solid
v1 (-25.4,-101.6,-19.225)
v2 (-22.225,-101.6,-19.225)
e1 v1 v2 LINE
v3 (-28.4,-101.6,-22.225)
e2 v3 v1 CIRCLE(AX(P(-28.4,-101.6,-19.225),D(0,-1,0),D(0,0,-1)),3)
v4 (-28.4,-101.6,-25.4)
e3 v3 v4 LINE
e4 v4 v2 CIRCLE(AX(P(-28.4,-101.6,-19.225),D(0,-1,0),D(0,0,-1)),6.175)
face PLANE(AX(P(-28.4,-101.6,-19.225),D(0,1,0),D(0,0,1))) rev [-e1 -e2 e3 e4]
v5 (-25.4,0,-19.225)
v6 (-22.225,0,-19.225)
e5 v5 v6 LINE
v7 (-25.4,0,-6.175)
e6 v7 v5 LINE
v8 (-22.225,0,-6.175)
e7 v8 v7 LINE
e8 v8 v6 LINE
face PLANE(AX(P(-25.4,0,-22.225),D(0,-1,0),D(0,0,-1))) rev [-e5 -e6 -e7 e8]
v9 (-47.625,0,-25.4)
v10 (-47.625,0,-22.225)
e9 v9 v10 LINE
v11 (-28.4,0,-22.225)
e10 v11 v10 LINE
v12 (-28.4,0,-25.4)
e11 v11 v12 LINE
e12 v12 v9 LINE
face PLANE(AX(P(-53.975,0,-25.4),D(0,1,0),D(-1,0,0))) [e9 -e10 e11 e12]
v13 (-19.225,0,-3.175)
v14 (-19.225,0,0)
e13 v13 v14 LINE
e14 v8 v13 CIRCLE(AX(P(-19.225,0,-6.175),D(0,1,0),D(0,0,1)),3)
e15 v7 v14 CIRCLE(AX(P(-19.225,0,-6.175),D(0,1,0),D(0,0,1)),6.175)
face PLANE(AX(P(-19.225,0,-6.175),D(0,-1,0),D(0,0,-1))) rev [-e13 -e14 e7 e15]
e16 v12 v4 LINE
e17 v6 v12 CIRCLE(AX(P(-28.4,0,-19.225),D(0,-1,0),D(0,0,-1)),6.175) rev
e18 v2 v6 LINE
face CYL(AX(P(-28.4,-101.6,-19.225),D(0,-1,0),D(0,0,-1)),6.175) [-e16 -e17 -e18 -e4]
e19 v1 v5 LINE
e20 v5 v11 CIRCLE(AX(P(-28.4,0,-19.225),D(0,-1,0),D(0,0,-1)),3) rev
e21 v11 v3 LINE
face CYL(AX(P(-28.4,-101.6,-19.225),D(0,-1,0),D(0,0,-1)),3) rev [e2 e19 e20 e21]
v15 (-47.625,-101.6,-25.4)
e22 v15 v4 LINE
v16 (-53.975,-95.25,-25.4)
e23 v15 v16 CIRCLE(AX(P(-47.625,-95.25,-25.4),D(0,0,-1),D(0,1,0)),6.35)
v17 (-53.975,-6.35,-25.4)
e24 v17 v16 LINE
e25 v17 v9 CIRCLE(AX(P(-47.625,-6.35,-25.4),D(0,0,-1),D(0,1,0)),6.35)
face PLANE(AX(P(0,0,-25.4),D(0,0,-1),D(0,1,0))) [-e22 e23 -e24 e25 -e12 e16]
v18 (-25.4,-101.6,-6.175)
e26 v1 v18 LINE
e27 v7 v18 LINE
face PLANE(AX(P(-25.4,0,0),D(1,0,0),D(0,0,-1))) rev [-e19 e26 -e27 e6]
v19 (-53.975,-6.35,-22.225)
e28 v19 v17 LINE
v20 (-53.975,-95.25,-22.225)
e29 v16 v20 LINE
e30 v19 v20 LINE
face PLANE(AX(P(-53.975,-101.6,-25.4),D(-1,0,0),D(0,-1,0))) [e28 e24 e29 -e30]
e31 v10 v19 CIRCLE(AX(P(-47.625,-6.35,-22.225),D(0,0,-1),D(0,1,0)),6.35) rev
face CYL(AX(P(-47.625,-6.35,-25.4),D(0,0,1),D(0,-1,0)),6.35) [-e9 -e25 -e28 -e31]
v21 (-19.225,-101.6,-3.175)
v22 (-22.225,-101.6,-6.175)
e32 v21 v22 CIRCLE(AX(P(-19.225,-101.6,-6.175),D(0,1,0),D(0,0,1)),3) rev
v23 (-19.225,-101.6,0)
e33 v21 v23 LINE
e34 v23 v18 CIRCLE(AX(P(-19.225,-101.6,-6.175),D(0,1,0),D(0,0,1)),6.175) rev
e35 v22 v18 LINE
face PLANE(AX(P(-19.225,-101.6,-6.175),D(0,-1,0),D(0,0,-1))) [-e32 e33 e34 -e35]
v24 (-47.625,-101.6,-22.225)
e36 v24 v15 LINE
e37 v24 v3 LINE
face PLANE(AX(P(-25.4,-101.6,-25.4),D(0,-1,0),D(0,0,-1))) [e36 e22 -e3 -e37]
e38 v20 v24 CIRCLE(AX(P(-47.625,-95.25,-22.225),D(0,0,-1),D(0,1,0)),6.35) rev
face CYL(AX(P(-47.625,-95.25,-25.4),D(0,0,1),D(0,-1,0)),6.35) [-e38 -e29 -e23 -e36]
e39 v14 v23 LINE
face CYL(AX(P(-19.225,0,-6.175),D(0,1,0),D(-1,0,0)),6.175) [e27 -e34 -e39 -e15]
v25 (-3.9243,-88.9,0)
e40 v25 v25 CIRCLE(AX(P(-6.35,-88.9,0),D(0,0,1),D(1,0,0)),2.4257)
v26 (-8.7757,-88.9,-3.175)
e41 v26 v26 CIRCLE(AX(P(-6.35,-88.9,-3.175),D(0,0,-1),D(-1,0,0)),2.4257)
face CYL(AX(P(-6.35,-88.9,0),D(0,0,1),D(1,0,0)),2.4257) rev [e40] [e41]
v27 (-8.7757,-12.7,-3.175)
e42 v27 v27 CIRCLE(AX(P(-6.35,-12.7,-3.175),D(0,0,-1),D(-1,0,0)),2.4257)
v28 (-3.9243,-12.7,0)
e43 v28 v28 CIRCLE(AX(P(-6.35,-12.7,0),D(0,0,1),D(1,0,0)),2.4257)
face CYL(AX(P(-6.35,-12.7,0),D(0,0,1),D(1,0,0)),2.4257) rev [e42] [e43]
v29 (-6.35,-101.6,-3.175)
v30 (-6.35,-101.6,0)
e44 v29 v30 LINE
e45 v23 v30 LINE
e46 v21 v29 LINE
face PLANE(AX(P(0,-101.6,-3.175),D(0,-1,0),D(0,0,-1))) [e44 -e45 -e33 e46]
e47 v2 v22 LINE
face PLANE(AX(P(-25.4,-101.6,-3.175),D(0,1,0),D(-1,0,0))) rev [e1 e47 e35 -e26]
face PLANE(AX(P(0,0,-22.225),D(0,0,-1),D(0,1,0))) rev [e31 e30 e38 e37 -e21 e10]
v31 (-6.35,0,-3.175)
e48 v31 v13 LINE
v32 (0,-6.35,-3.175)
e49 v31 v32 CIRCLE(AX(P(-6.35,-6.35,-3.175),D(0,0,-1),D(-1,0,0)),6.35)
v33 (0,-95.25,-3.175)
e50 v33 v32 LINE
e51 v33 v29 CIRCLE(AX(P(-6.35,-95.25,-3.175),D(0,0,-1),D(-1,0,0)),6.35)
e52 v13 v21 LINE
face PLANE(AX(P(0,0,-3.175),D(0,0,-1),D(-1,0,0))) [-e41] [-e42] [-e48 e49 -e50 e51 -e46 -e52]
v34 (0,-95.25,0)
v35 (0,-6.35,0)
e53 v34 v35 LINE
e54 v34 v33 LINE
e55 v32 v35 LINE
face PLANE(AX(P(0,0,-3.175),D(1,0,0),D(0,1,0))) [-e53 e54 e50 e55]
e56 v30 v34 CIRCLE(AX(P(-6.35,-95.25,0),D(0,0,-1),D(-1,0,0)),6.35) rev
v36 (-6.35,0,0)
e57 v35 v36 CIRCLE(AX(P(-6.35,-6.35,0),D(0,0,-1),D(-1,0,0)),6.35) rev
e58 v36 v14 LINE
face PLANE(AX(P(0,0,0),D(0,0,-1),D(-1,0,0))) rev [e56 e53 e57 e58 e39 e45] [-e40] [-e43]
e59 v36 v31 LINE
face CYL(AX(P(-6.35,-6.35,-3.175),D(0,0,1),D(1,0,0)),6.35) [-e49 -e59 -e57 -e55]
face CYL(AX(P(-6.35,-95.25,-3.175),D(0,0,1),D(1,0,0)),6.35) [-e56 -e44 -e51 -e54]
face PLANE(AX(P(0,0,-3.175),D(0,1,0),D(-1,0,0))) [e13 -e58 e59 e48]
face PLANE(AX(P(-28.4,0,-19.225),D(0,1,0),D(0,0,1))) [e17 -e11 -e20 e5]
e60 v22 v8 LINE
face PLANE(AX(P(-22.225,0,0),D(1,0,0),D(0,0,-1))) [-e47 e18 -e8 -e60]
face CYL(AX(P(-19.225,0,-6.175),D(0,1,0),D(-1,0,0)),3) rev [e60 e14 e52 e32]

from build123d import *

# Parameters (mm, degrees)
SKETCH1_W                    = 25.4
SKETCH1_H                    = 101.6
BASE_FLANGE1_DEPTH           = 3.175
EDGE_FLANGE1_STRIP_W         = 18.7
EDGE_FLANGE1_STRIP_H         = 3.175
EDGE_FLANGE1_STRIP_CUT_DEPTH = 101.6
EDGE_FLANGE1_DEPTH           = 101.6
EDGE_FLANGE2_STRIP_W         = 18.7
EDGE_FLANGE2_STRIP_H         = 3.175
EDGE_FLANGE2_STRIP_CUT_DEPTH = 101.6
EDGE_FLANGE2_DEPTH           = 101.6
F_11_0_191_DIAMETER_HOLE1_D  = 4.8514
FILLET1_R                    = 6.35


# Sheet-metal steps are written as plain solids
with BuildPart() as part:
    # Sketch1 → Base-Flange1 (new body)
    with BuildSketch(Plane.XY):
        with Locations((-12.7, -50.8)):
            Rectangle(SKETCH1_W, SKETCH1_H)
    extrude(amount=-BASE_FLANGE1_DEPTH)

    # Edge-Flange1 strip (across the edge) → Edge-Flange1 strip cut (cut)
    with BuildSketch(Plane(origin=(-25.4, -101.6, -3.175), x_dir=(1, 0, 0), z_dir=(0, 1, 0))):
        with Locations((-3.175, -1.5875)):
            Rectangle(EDGE_FLANGE1_STRIP_W, EDGE_FLANGE1_STRIP_H)
    extrude(amount=EDGE_FLANGE1_STRIP_CUT_DEPTH, mode=Mode.SUBTRACT)

    # Edge-Flange1 section (across the edge) → Edge-Flange1 (add)
    with BuildSketch(Plane(origin=(-25.4, -101.6, -3.175), x_dir=(1, 0, 0), z_dir=(0, 1, 0))):
        with BuildLine():
            Line((0, 3), (0, 19.05))
            Line((0, 19.05), (3.175, 19.05))
            Line((3.175, 19.05), (3.175, 3))
            ThreePointArc((3.175, 3), (4.053679656, 0.878679656), (6.175, 0))
            Line((6.175, 0), (6.175, -3.175))
            ThreePointArc((6.175, -3.175), (1.808615626, -1.366384374), (0, 3))
        make_face()
    extrude(amount=EDGE_FLANGE1_DEPTH)

    # Edge-Flange2 strip (across the edge) → Edge-Flange2 strip cut (cut)
    with BuildSketch(Plane(origin=(-25.4, 0, -22.225), x_dir=(0, 0, 1), z_dir=(0, -1, 0))):
        with Locations((-6.35, -1.5875)):
            Rectangle(EDGE_FLANGE2_STRIP_W, EDGE_FLANGE2_STRIP_H)
    extrude(amount=EDGE_FLANGE2_STRIP_CUT_DEPTH, mode=Mode.SUBTRACT)

    # Edge-Flange2 section (across the edge) → Edge-Flange2 (add)
    with BuildSketch(Plane(origin=(-25.4, 0, -22.225), x_dir=(0, 0, 1), z_dir=(0, -1, 0))):
        with BuildLine():
            Line((-3.175, 3), (-3.175, 28.575))
            Line((-3.175, 28.575), (0, 28.575))
            Line((0, 28.575), (0, 3))
            ThreePointArc((0, 3), (0.878679656, 0.878679656), (3, 0))
            Line((3, 0), (3, -3.175))
            ThreePointArc((3, -3.175), (-1.366384374, -1.366384374), (-3.175, 3))
        make_face()
    extrude(amount=EDGE_FLANGE2_DEPTH)

    # #11 (0.191) Diameter Hole1 (through all)
    with Locations(Plane.XY):
        with Locations((-6.35, -12.7), (-6.35, -88.9)):
            Hole(F_11_0_191_DIAMETER_HOLE1_D / 2)

    # Fillet1
    fillet1_edges = [part.edges().sort_by_distance(p)[0] for p in [
        (-53.975, 0, -23.8125),
        (-53.975, -101.6, -23.8125),
        (0, -101.6, -1.5875),
        (0, 0, -1.5875),
    ]]
    fillet(fillet1_edges, radius=FILLET1_R)


solid = part.part
